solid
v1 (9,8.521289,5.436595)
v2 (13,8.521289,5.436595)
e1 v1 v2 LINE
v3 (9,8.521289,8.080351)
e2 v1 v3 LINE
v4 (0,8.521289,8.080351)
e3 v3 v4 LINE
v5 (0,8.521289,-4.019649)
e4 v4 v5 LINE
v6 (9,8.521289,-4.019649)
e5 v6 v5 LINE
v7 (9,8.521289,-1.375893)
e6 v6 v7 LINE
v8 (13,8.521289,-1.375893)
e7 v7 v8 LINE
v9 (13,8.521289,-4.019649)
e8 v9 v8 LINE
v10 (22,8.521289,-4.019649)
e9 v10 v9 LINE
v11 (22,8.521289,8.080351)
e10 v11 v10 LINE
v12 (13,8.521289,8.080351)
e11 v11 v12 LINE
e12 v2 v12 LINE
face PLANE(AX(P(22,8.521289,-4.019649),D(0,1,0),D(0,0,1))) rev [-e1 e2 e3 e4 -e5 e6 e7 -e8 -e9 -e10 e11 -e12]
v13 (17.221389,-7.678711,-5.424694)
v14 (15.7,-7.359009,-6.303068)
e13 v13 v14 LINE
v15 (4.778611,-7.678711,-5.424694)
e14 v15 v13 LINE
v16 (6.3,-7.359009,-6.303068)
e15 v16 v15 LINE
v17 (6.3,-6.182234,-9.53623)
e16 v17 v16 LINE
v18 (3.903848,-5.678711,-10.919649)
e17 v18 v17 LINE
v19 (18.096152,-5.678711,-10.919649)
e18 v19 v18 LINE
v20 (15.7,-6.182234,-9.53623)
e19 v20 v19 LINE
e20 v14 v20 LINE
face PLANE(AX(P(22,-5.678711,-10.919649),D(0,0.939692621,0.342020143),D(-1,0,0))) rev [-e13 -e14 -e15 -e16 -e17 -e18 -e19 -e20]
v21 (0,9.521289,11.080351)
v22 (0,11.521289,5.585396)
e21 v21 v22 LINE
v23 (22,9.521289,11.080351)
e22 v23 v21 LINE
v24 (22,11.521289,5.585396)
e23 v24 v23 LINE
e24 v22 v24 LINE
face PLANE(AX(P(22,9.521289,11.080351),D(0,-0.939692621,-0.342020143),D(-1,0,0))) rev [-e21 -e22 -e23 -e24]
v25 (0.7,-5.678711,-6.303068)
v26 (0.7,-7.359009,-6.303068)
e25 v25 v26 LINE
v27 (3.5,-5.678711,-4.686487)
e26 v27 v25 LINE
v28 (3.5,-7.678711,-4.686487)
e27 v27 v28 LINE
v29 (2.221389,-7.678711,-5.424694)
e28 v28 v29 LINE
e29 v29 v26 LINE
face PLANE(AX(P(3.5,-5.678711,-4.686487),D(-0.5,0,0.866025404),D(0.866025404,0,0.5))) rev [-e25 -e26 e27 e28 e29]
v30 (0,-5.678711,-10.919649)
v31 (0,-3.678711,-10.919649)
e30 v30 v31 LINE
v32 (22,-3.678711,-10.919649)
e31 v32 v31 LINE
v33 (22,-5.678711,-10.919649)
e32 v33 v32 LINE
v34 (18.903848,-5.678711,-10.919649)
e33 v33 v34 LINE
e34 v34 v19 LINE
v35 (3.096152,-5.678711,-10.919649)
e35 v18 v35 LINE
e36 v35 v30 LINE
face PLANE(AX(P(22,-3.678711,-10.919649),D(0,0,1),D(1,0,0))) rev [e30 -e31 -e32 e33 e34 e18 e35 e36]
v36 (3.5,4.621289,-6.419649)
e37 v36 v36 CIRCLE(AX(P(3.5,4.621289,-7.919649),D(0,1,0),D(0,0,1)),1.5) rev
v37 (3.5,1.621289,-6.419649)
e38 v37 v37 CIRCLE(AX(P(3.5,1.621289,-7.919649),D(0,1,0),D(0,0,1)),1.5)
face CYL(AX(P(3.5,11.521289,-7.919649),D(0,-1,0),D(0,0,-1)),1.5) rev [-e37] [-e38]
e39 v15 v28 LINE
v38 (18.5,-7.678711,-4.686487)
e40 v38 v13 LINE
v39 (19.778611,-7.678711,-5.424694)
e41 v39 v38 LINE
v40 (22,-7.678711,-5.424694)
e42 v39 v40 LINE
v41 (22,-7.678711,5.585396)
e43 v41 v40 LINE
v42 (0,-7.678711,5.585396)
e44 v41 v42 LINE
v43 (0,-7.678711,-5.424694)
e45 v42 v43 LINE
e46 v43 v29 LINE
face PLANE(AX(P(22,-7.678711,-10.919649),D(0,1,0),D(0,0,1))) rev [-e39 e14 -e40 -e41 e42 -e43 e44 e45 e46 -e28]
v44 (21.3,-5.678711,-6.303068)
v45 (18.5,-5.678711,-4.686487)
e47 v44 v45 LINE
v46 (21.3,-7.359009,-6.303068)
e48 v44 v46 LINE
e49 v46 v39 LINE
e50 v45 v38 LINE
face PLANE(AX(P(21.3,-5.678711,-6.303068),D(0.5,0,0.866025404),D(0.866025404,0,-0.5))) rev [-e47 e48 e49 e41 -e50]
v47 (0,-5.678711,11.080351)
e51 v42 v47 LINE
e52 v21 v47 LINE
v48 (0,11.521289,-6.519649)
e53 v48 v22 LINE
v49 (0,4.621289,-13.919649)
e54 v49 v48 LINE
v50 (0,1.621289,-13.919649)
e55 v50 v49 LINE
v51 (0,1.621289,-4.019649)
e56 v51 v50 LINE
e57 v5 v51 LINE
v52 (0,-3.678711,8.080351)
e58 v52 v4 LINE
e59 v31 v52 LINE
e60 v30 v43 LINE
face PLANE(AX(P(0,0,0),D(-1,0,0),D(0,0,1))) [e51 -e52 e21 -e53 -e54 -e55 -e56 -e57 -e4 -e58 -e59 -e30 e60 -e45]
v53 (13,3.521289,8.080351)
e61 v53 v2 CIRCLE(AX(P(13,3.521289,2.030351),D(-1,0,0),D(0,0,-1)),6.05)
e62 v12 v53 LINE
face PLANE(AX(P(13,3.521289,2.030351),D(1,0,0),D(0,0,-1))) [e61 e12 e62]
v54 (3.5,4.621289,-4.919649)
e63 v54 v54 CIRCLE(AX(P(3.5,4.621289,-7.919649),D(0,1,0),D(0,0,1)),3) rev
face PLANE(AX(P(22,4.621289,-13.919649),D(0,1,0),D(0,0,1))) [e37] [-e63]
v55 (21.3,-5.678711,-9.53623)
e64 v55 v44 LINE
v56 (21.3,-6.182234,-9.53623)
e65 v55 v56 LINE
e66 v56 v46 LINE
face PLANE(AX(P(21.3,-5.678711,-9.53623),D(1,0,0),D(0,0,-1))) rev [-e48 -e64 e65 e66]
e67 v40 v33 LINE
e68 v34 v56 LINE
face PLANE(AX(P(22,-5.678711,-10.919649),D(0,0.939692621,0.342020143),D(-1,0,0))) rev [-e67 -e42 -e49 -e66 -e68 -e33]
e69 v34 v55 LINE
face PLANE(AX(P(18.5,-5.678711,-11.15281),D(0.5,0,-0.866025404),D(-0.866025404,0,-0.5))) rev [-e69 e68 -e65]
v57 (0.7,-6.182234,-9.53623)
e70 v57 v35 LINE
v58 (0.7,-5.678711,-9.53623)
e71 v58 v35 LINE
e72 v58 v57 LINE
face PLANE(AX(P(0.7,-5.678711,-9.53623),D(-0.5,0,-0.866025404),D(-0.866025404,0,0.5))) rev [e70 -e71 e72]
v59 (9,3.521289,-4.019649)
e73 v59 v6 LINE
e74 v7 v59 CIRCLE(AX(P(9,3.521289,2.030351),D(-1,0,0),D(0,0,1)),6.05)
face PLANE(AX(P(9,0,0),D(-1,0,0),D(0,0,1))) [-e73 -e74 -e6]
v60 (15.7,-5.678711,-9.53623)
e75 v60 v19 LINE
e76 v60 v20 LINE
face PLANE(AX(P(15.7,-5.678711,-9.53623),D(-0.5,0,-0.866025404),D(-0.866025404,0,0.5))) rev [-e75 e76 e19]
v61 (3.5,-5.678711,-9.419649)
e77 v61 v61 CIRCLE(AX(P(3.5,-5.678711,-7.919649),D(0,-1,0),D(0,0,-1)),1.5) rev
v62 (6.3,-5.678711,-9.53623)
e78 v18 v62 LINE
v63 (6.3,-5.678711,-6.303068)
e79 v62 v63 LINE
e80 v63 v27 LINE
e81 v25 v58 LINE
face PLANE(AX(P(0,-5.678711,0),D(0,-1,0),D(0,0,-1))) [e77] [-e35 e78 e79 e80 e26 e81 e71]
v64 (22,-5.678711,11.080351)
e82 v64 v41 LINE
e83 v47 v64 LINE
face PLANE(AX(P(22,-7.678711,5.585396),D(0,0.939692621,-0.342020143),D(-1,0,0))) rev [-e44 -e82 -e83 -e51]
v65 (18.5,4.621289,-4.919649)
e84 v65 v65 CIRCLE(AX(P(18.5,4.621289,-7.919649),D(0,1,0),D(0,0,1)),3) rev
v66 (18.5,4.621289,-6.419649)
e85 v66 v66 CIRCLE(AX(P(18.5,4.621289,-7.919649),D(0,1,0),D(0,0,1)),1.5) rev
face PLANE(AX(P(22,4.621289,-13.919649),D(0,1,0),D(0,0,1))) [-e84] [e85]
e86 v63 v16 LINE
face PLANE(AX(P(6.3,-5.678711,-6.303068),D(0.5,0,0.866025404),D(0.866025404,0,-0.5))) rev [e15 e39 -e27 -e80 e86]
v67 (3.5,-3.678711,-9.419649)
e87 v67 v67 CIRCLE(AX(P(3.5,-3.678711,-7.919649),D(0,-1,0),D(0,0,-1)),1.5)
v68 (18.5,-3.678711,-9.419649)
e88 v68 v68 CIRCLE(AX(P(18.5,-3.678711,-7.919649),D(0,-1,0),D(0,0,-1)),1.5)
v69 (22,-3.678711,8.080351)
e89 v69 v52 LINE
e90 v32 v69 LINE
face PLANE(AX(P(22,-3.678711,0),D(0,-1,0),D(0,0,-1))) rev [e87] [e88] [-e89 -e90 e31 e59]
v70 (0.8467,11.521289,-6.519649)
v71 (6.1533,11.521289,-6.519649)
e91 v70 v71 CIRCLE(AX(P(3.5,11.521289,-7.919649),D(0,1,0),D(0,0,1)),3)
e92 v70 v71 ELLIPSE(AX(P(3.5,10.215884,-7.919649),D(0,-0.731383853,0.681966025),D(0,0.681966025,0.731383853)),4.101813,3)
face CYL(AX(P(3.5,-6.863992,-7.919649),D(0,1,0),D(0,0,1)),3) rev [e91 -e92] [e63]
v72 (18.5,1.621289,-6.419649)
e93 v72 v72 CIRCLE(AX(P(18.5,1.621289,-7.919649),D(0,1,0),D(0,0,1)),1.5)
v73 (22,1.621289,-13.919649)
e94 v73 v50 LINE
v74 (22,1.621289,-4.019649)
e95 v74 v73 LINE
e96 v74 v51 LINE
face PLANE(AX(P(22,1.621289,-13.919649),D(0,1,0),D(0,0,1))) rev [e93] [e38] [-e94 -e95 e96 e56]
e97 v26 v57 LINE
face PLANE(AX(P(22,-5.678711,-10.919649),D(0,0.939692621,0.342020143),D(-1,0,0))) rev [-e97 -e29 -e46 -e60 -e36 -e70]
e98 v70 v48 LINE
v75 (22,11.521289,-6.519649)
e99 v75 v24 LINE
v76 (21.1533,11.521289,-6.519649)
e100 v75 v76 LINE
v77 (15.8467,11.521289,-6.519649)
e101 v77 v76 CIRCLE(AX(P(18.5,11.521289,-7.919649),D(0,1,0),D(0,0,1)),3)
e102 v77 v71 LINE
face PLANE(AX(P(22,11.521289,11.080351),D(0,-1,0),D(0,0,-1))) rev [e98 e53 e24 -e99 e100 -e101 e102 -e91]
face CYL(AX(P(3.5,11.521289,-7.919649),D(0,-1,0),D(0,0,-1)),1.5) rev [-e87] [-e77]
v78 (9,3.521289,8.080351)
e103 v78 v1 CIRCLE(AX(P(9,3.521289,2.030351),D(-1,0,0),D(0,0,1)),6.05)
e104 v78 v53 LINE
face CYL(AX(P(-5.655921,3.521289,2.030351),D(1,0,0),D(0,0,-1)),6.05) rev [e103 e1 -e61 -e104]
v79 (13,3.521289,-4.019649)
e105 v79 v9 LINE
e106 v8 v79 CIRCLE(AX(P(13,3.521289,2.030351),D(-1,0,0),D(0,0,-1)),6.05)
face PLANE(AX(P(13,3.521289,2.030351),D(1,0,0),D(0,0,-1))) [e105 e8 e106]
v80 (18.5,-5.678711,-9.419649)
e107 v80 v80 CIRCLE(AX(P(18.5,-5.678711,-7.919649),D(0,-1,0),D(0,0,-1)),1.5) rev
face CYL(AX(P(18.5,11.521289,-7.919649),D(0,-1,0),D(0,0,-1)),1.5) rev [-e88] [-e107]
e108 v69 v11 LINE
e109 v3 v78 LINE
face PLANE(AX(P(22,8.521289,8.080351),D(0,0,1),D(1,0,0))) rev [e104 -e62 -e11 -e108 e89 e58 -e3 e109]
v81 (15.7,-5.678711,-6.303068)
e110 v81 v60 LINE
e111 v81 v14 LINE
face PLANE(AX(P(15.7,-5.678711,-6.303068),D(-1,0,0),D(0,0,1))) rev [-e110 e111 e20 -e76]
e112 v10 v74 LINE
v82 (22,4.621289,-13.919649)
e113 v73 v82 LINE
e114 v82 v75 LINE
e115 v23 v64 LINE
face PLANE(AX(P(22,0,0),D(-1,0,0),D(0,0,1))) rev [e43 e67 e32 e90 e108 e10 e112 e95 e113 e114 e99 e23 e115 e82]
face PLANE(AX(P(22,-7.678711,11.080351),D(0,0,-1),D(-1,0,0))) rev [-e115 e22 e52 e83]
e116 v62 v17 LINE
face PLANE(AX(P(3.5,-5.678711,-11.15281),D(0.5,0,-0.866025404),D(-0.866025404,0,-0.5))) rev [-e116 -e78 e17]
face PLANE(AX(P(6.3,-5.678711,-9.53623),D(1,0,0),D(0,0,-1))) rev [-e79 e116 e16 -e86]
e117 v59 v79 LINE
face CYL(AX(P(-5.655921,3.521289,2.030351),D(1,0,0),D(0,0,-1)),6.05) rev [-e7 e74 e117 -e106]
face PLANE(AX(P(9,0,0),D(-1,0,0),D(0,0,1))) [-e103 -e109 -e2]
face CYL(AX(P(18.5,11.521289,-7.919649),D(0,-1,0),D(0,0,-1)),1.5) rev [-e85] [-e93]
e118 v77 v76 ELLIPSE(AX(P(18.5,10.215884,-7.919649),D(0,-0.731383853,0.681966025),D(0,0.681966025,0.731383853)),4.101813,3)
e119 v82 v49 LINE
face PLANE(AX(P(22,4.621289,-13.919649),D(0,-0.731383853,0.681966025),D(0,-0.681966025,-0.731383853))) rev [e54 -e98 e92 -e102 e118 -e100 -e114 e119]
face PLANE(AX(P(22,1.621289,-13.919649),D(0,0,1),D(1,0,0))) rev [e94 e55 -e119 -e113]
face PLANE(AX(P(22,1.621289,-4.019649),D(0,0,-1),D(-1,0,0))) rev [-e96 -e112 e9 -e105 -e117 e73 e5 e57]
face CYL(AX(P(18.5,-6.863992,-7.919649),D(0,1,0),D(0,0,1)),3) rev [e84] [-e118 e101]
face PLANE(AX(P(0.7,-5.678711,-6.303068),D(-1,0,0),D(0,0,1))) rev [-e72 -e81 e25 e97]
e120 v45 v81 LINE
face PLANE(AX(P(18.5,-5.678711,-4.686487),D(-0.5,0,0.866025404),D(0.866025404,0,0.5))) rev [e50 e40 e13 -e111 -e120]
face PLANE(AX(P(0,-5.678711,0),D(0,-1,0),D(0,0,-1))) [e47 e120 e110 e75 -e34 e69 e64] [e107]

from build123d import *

# Parameters (mm, degrees)
SALIENTE_EXTRUIR1_DEPTH = 22
CROQUIS2_R              = 1.5
CORTAR_EXTRUIR1_DEPTH   = 33.348054431
SALIENTE_EXTRUIR2_START = -9
SALIENTE_EXTRUIR2_DEPTH = 4
CHAFL_N1_SIZE           = 2
CHAFL_N1_SIZE_2         = 5.494954839
CORTAR_EXTRUIR2_DEPTH   = 2
CHAFL_N2_SIZE           = 2
CHAFL_N2_SIZE2          = 5.494954839
CROQUIS5_R              = 3
CORTAR_EXTRUIR3_DEPTH   = 6.9


with BuildPart() as part:
    # Croquis1 → Saliente-Extruir1 (new body)
    with BuildSketch(Plane(origin=(0, 0, 0), x_dir=(0, 0, -1), z_dir=(1, 0, 0))):
        Polygon((0, -3.67871106), (10.9196489, -3.67871106), (10.9196489, -7.67871106), (-11.0803511, -7.67871106), (-11.0803511, 11.52128894), (6.5196489, 11.52128894), (13.9196489, 4.62128894), (13.9196489, 1.62128894), (4.0196489, 1.62128894), (4.0196489, 8.52128894), (-8.0803511, 8.52128894), (-8.0803511, -3.67871106), align=None)
    extrude(amount=SALIENTE_EXTRUIR1_DEPTH)

    # Croquis2 → Cortar-Extruir1 (cut, through all)
    with BuildSketch(Plane.XZ.offset(7.67871106)):
        with Locations(Location((3.5, -7.9196489, 0), (0, 0, 270))):
            Circle(CROQUIS2_R)
        with Locations(Location((18.5, -7.9196489, 0), (0, 0, 270))):
            Circle(CROQUIS2_R)
    extrude(amount=-CORTAR_EXTRUIR1_DEPTH, mode=Mode.SUBTRACT)

    # Croquis3 → Saliente-Extruir2 (add)
    with BuildSketch(Plane(origin=(22, 0, 0), x_dir=(0, 0, -1), z_dir=(1, 0, 0)).offset(SALIENTE_EXTRUIR2_START)):
        with BuildLine():
            Line((-8.0803511, 8.52128894), (-8.0803511, 3.52128894))
            ThreePointArc((-8.0803511, 3.52128894), (-7.378728322, 6.349249529), (-5.436595366, 8.52128894))
            Line((-5.436595366, 8.52128894), (-8.0803511, 8.52128894))
        make_face()
        with BuildLine():
            Line((4.0196489, 8.52128894), (4.0196489, 3.52128894))
            ThreePointArc((4.0196489, 3.52128894), (3.318026122, 6.349249529), (1.375893166, 8.52128894))
            Line((1.375893166, 8.52128894), (4.0196489, 8.52128894))
        make_face()
    extrude(amount=-SALIENTE_EXTRUIR2_DEPTH)

    # Chaflán1
    # the kernel refuses this chamfer: 5.494954839, 2 mm, written as the material it takes off along each edge
    with BuildSketch(Plane(origin=(-14.254982899, -7.67871106, -10.9196489), x_dir=(0, 0.9950833631817486, -0.09904090225205035), z_dir=(1, 0, 0))) as chafl_n1_piece_1:
        Polygon((CHAFL_N1_SIZE * 0.995083363182, CHAFL_N1_SIZE * 0.0990409022521), (-CHAFL_N1_SIZE_2 * 0.0990409022504, CHAFL_N1_SIZE_2 * 0.995083363165), (0, 0), align=None)
    extrude(amount=50.509965797, mode=Mode.SUBTRACT)

    # Croquis4 → Cortar-Extruir2 (cut)
    with BuildSketch(Plane.XZ.offset(7.67871106)):
        Polygon((3.5, -4.686487393), (0.7, -6.303068146), (0.7, -9.536229654), (3.5, -11.152810408), (6.3, -9.536229654), (6.3, -6.303068146), align=None)
        Polygon((18.5, -4.686487393), (15.7, -6.303068146), (15.7, -9.536229654), (18.5, -11.152810408), (21.3, -9.536229654), (21.3, -6.303068146), align=None)
    extrude(amount=-CORTAR_EXTRUIR2_DEPTH, mode=Mode.SUBTRACT)

    # Chaflán2
    chafl_n2_edges = [part.edges().sort_by_distance(p)[0] for p in [
        (11, -7.67871106, 11.0803511),
        (11, 11.52128894, 11.0803511),
    ]]
    chafl_n2_side = [part.faces().sort_by_distance(p)[0] for p in [
        (11, 1.92128894, 11.0803511),
    ]]
    chamfer(chafl_n2_edges, length=CHAFL_N2_SIZE, length2=CHAFL_N2_SIZE2, reference=chafl_n2_side[0])

    # Croquis5 → Cortar-Extruir3 (cut)
    with BuildSketch(Plane(origin=(0, 11.52128894, 0), x_dir=(1, 0, 0), z_dir=(0, 1, 0))):
        with Locations(Location((3.5, 7.9196489, 0), (0, 0, 270))):
            Circle(CROQUIS5_R)
        with Locations(Location((18.5, 7.9196489, 0), (0, 0, 270))):
            Circle(CROQUIS5_R)
    extrude(amount=-CORTAR_EXTRUIR3_DEPTH, mode=Mode.SUBTRACT)


solid = part.part
